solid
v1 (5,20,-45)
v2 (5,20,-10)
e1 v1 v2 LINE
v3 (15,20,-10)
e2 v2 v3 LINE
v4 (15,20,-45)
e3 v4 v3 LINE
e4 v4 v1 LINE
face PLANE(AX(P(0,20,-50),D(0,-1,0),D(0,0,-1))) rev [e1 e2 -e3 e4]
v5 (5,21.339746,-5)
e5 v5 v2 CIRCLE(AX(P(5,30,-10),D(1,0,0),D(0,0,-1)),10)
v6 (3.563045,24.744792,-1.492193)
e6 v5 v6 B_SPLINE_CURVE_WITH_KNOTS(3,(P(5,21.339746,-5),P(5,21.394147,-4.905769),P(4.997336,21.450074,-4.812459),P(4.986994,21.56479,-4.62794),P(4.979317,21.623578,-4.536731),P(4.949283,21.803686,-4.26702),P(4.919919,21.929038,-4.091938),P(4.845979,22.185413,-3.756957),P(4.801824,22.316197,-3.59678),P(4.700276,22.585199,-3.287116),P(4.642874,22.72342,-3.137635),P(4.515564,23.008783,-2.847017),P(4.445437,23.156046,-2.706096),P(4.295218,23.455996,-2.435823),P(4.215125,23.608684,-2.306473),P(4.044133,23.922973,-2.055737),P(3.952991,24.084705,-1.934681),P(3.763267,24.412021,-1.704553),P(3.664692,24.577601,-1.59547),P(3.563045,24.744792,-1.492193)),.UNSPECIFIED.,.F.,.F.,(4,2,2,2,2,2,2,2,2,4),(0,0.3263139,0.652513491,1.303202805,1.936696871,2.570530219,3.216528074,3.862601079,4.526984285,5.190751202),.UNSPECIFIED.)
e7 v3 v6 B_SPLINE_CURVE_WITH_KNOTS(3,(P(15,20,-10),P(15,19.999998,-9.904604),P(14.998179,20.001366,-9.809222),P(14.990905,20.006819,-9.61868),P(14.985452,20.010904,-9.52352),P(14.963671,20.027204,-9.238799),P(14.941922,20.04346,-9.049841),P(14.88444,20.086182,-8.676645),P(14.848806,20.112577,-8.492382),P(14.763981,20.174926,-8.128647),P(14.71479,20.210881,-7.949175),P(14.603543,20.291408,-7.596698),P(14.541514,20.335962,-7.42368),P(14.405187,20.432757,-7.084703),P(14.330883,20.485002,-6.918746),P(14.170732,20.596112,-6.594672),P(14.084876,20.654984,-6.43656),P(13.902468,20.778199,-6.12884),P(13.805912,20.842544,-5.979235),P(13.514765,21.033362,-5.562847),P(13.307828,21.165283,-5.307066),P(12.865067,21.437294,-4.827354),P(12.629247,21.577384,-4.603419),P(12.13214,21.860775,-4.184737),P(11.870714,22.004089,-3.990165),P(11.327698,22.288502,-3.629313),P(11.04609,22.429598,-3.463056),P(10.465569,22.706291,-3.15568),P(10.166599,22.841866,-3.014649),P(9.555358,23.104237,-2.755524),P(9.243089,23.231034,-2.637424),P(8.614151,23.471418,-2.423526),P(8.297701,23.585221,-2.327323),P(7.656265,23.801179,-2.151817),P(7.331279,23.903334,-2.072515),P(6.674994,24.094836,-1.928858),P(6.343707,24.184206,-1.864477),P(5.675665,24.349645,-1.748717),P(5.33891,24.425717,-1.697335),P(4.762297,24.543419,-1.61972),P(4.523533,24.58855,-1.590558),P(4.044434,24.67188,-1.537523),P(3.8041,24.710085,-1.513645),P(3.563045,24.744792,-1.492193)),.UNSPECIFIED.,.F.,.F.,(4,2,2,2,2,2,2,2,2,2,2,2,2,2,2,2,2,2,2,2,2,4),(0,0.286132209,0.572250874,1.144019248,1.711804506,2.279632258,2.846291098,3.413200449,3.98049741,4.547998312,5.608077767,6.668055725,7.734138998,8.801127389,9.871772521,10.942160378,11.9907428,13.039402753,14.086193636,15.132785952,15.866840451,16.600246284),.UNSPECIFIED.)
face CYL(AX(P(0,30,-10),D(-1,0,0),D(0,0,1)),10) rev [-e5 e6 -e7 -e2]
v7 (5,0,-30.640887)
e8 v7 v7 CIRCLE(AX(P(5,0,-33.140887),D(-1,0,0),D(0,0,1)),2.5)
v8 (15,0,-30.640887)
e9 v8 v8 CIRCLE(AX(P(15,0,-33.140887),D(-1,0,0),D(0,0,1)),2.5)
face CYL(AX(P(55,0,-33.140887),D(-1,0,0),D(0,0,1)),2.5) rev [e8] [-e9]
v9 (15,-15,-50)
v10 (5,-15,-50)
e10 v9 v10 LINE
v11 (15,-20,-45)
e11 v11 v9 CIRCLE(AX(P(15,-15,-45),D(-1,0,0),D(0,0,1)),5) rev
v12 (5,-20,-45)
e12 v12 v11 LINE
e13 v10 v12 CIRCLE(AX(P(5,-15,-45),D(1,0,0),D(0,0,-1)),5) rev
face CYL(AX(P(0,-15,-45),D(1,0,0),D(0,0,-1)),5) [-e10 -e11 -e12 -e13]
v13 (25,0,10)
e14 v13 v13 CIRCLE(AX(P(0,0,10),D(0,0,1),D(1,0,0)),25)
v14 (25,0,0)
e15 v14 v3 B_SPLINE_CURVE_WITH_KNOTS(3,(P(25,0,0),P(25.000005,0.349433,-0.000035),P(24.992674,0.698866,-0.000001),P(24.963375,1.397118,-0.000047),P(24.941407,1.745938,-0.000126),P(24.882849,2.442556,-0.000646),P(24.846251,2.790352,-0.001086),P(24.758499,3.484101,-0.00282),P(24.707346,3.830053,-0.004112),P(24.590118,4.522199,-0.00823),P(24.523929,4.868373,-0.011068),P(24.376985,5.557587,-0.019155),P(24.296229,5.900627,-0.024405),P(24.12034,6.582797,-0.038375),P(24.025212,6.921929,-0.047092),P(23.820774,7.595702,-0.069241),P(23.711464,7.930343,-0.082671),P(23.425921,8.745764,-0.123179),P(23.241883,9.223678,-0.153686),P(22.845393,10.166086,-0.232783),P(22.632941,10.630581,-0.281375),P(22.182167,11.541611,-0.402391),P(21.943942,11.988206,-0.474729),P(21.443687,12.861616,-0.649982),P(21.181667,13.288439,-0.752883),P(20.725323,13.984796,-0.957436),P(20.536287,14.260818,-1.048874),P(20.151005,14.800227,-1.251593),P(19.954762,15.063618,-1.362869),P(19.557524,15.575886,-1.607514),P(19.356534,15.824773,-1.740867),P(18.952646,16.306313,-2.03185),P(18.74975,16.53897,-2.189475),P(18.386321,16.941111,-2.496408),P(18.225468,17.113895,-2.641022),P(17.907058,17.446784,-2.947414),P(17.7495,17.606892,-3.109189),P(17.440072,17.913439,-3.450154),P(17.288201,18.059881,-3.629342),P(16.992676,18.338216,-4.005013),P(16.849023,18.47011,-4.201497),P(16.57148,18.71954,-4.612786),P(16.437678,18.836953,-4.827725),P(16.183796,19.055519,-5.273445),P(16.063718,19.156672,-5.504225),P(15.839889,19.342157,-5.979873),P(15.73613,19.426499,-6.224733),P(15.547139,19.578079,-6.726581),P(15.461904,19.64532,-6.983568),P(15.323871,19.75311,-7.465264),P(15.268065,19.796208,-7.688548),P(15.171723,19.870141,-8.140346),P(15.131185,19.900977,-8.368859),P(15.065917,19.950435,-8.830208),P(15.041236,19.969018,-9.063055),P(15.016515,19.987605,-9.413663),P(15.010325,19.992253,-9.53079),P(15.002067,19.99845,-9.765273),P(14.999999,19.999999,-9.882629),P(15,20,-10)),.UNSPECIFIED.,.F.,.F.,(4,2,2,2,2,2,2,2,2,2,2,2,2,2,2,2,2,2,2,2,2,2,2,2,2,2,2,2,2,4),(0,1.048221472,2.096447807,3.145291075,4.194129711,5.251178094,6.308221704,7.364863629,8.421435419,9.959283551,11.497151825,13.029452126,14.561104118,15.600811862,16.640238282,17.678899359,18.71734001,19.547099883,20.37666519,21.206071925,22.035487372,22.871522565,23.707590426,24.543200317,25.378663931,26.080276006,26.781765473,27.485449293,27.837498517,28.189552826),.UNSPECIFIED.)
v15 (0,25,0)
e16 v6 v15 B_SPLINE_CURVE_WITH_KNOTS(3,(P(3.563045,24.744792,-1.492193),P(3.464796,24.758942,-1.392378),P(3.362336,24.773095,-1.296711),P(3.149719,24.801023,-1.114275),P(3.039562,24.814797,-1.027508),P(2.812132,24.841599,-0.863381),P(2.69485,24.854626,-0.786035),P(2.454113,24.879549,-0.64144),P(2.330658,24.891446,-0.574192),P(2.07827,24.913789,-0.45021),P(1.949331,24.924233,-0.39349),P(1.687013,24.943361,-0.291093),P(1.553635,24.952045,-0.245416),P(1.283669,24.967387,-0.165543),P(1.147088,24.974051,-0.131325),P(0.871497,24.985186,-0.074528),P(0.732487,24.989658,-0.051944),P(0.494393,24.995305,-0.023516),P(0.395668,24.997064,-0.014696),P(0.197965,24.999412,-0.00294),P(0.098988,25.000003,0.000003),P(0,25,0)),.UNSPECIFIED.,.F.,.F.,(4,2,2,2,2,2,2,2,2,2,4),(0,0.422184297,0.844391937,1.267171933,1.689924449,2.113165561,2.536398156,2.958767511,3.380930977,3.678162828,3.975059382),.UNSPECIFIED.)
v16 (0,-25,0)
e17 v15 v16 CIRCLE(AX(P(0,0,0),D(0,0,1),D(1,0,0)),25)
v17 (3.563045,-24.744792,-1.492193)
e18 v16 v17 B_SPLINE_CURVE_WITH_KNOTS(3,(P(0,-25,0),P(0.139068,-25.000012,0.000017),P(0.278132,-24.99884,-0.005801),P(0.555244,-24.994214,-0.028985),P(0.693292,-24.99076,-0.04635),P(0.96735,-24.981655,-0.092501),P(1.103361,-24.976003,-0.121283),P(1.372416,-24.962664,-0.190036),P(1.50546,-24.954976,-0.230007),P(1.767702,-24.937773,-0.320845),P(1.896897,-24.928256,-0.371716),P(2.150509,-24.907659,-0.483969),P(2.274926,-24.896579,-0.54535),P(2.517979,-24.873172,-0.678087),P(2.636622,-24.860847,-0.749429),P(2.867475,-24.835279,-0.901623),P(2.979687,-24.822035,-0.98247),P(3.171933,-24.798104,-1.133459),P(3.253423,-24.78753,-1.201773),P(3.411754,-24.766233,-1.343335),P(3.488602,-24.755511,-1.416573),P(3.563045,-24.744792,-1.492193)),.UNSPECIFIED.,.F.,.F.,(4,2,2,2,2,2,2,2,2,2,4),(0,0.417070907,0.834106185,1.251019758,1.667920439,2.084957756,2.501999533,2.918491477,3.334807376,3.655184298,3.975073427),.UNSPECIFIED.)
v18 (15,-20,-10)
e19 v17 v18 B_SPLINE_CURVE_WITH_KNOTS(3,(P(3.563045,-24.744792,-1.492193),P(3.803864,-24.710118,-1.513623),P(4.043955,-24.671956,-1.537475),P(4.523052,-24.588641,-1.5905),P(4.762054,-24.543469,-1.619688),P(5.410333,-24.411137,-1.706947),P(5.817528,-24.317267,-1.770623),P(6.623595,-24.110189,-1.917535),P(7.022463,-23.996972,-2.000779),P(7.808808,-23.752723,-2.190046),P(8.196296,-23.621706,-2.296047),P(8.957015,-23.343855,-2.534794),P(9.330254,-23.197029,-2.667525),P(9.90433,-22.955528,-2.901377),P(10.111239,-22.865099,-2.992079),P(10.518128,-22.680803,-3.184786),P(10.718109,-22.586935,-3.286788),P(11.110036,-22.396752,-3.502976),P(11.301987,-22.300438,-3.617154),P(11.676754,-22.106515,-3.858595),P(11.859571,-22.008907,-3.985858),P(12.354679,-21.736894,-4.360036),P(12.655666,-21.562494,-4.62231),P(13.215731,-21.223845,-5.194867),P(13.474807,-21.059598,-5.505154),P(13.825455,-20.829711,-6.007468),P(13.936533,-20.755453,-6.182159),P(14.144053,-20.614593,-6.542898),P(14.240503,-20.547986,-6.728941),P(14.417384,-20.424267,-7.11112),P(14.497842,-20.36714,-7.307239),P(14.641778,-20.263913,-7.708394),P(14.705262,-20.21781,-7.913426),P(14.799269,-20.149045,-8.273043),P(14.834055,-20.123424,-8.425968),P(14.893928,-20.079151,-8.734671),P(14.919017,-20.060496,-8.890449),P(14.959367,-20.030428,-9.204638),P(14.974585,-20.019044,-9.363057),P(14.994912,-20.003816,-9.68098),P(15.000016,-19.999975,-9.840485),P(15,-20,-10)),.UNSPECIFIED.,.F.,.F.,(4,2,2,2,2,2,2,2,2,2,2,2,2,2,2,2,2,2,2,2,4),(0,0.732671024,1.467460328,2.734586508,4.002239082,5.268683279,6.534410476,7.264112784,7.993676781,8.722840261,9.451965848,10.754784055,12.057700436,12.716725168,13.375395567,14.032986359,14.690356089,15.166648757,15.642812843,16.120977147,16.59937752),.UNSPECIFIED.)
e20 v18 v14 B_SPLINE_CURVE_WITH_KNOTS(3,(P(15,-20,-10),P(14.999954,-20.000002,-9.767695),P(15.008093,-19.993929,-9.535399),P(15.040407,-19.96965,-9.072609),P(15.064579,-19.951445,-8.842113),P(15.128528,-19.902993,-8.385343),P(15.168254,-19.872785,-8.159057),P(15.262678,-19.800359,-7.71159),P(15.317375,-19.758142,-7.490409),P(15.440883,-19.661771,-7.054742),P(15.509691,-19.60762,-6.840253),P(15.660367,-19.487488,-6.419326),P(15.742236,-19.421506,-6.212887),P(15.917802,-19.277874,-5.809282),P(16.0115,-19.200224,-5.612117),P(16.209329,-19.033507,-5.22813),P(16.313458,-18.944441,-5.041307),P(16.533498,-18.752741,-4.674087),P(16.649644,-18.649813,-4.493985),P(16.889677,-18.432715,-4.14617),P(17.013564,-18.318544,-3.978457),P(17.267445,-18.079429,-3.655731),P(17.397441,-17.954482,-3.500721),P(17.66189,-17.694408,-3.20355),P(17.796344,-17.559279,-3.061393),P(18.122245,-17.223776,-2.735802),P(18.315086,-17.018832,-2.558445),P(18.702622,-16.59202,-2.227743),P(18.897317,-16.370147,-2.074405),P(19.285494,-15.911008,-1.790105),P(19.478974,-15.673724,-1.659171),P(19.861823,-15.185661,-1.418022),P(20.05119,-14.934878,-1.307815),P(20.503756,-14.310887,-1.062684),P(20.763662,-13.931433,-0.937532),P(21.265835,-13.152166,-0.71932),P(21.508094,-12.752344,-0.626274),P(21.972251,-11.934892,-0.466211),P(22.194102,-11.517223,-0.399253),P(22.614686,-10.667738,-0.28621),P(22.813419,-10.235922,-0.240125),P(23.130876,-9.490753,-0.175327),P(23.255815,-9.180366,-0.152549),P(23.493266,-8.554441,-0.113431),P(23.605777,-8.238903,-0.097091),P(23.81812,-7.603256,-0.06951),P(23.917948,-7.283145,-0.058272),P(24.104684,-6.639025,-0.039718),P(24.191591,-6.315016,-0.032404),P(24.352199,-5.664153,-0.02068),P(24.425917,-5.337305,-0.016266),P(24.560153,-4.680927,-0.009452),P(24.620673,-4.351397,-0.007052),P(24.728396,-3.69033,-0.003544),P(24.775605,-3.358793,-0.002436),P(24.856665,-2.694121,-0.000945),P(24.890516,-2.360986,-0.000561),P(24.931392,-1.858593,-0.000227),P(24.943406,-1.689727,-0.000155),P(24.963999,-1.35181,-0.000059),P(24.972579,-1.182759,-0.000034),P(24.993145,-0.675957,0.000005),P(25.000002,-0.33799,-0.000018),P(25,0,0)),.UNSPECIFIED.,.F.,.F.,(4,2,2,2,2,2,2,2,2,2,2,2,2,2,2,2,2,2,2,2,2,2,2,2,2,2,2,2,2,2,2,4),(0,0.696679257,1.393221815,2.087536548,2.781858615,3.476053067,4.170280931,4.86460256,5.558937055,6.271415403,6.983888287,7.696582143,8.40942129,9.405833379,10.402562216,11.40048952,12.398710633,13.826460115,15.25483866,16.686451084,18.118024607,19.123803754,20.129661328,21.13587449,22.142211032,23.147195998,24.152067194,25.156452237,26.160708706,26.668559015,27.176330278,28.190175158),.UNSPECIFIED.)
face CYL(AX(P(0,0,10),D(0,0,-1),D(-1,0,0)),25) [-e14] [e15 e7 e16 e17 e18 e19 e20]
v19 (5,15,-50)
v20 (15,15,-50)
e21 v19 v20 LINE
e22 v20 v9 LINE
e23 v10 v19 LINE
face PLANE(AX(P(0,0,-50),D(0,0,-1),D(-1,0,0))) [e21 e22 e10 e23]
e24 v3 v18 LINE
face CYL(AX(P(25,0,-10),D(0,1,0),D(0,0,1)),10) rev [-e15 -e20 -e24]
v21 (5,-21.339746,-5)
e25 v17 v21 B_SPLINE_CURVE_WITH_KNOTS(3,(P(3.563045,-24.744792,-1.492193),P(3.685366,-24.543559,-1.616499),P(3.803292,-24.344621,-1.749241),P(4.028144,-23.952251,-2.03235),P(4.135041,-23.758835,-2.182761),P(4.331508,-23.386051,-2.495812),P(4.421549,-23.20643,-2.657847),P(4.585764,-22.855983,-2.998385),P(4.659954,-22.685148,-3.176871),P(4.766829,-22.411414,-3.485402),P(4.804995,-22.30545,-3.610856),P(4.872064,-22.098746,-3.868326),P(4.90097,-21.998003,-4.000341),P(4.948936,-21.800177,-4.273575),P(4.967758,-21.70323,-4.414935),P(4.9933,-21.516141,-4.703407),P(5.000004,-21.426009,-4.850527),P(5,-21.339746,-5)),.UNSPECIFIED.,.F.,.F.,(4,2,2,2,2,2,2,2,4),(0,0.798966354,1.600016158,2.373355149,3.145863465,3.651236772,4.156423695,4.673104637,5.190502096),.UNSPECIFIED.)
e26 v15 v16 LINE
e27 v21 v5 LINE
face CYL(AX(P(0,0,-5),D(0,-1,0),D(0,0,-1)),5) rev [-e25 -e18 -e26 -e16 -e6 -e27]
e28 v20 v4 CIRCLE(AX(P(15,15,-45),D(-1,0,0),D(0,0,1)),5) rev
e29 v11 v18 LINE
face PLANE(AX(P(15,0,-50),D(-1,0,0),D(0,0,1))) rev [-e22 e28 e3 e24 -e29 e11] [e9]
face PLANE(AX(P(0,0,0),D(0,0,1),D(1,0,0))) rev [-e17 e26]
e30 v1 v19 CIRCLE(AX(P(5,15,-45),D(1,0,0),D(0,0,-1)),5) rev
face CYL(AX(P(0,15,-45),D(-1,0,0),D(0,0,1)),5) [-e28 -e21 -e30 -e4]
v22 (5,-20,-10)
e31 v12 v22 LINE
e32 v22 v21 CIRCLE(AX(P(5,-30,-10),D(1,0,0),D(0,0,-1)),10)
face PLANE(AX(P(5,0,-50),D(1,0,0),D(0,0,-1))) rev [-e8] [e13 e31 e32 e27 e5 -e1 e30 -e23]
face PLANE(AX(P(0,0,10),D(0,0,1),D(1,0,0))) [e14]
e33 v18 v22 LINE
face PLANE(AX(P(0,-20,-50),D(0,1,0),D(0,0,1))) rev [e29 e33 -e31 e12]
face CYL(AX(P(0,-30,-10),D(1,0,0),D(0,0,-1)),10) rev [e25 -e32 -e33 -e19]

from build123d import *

# Parameters (mm, degrees)
SKETCH1_W           = 10
SKETCH1_H           = 40
BOSS_EXTRUDE1_DEPTH = 10
SKETCH2_W           = 10
SKETCH2_H           = 40
BOSS_EXTRUDE2_DEPTH = 50
FILLET1_R           = 10
FILLET2_R           = 10
FILLET3_R           = 5
SKETCH3_R           = 2.4999999999999982
CUT_EXTRUDE1_DEPTH  = 50


with BuildPart() as part:
    # Sketch1 → Boss-Extrude1 (new body)
    with BuildSketch(Plane.XY):
        with BuildLine():
            Line((15, -20), (5.000000000000001, -20))
            Line((5.000000000000001, -20), (5.000000000000001, 20))
            Line((5.000000000000001, 20), (15, 20))
            ThreePointArc((15.000000000000002, 20), (-25, 3.06e-15), (14.999999999999995, -20.000000000000004))
        make_face()
        with BuildLine():
            Line((15.000000000000002, 20), (15.000000000000002, -20))
            ThreePointArc((14.999999999999995, -20.000000000000004), (22.360679774997894, -11.180339887498954), (25, -6.12e-15))
            ThreePointArc((25, 0), (22.360679774997898, 11.180339887498947), (15.000000000000002, 20))
        make_face()
        with Locations((10.000000000000002, 0)):
            Rectangle(SKETCH1_W, SKETCH1_H)
    extrude(amount=BOSS_EXTRUDE1_DEPTH)

    # Sketch2 → Boss-Extrude2 (add)
    with BuildSketch(Plane(origin=(0, 0, 0), x_dir=(-1, 0, 0), z_dir=(0, 0, -1))):
        with Locations((-10.000000000000002, 0)):
            Rectangle(SKETCH2_W, SKETCH2_H)
    extrude(amount=BOSS_EXTRUDE2_DEPTH)

    # Fillet1
    # the kernel refuses this fillet: 10 mm, written as the material it adds along each edge
    with BuildSketch(Plane(origin=(15.000000000000002, 20, 0), x_dir=(1, 0, 0), z_dir=(0, -1, 0))) as fillet1_piece_1_section:
        with BuildLine():
            CenterArc((FILLET1_R, -FILLET1_R), FILLET1_R, 90, 90)
            Line((-1.78e-15, -FILLET1_R), (-FILLET1_R * 0.02, -FILLET1_R))
            Line((-FILLET1_R * 0.02, -FILLET1_R), (-FILLET1_R * 0.02, FILLET1_R * 0.02))
            Line((-FILLET1_R * 0.02, FILLET1_R * 0.02), (FILLET1_R, FILLET1_R * 0.02))
            Line((FILLET1_R, FILLET1_R * 0.02), (FILLET1_R, 0))
        make_face()
    fillet1_piece_1 = extrude(amount=40, mode=Mode.PRIVATE)
    fillet1_piece_1 = fillet1_piece_1 & Plane(origin=(0, 0, -2.4332556101224805), x_dir=(0.6000000000000001, 0.8, 0), z_dir=(0, 0, -1)) * Cylinder(25, 120, mode=Mode.PRIVATE)
    add(fillet1_piece_1)

    # Fillet2
    # the kernel refuses this fillet: 10 mm, written as the material it adds along each edge
    with BuildSketch(Plane(origin=(5.000000000000001, 20, 0), x_dir=(0, 0, -1), z_dir=(1, 0, 0))) as fillet2_piece_1_section:
        with BuildLine():
            CenterArc((FILLET2_R, FILLET2_R), FILLET2_R, 180, 90)
            Line((-1.78e-15, FILLET2_R), (0, 0))
            Line((0, 0), (FILLET2_R, 0))
        make_face()
    fillet2_piece_1 = extrude(amount=9.8, mode=Mode.PRIVATE)
    fillet2_piece_1 = fillet2_piece_1 & Plane(origin=(0, 0, -2.8273844983564325), x_dir=(0.6000000000000001, 0.8, 0), z_dir=(0, 0, -1)) * Cylinder(25, 60, mode=Mode.PRIVATE)
    add(fillet2_piece_1)
    with BuildSketch(Plane(origin=(14.8, -20, 0), x_dir=(0, 0, -1), z_dir=(-1, 0, 0))) as fillet2_piece_2_section:
        with BuildLine():
            CenterArc((FILLET2_R, FILLET2_R), FILLET2_R, 180, 90)
            Line((-1.78e-15, FILLET2_R), (0, 0))
            Line((0, 0), (FILLET2_R, 0))
        make_face()
    fillet2_piece_2 = extrude(amount=9.799999999999999, mode=Mode.PRIVATE)
    fillet2_piece_2 = fillet2_piece_2 & Plane(origin=(0, 0, -2.827384190918209), x_dir=(0.6000000000000001, 0.8, 0), z_dir=(0, 0, -1)) * Cylinder(25, 60, mode=Mode.PRIVATE)
    add(fillet2_piece_2)
    with BuildSketch(Plane(origin=(40, -20, 0), x_dir=(0, 0, -1), z_dir=(-1, 0, 0))) as fillet2_piece_3_section:
        with BuildLine():
            CenterArc((FILLET2_R, FILLET2_R), FILLET2_R, 180, 90)
            Line((-1.78e-15, FILLET2_R), (0, 0))
            Line((0, 0), (FILLET2_R, 0))
        make_face()
    fillet2_piece_3 = extrude(amount=25.2, mode=Mode.PRIVATE)
    fillet2_piece_3 = fillet2_piece_3 & Plane(origin=(0, 0, -4.548731102364826), x_dir=(0.6, 0.8, 0), z_dir=(0, 0, -1)) * Cylinder(25, 91, mode=Mode.PRIVATE)
    add(fillet2_piece_3)
    with BuildSketch(Plane(origin=(14.8, 20, 0), x_dir=(0, 0, -1), z_dir=(1, 0, 0))) as fillet2_piece_4_section:
        with BuildLine():
            CenterArc((FILLET2_R, FILLET2_R), FILLET2_R, 180, 90)
            Line((-1.78e-15, FILLET2_R), (0, 0))
            Line((0, 0), (FILLET2_R, 0))
        make_face()
    fillet2_piece_4 = extrude(amount=25.2, mode=Mode.PRIVATE)
    fillet2_piece_4 = fillet2_piece_4 & Plane(origin=(0, 0, -4.548731089357503), x_dir=(0.6, 0.8, 0), z_dir=(0, 0, -1)) * Cylinder(25, 91, mode=Mode.PRIVATE)
    add(fillet2_piece_4)

    # Fillet3
    # the kernel refuses this fillet: 5 mm, written as the material it adds along each edge
    with BuildSketch(Plane(origin=(5, -36.99489742783178, 0), x_dir=(-1, 0, 0), z_dir=(0, 1, 0))) as fillet3_piece_1_section:
        with BuildLine():
            CenterArc((FILLET3_R, -FILLET3_R), FILLET3_R, 90, 90)
            Line((-8.9e-16, -FILLET3_R), (0, 0))
            Line((0, 0), (FILLET3_R, 0))
        make_face()
    fillet3_piece_1 = extrude(amount=73.98979485566356, mode=Mode.PRIVATE)
    fillet3_piece_1 = fillet3_piece_1 - Plane(origin=(3.8491362999010033, 30, -10), x_dir=(0, 0, -1), z_dir=(-1, 0, 0)) * Cylinder(10, 168, mode=Mode.PRIVATE)
    fillet3_piece_1 = fillet3_piece_1 & Plane(origin=(0, 0, -1.1013150030841163), x_dir=(0.6000000000000001, 0.8, 0), z_dir=(0, 0, -1)) * Cylinder(25, 168, mode=Mode.PRIVATE)
    fillet3_piece_1 = fillet3_piece_1 - Plane(origin=(3.849136299901005, -30, -10), x_dir=(0, 0, -1), z_dir=(1, 0, 0)) * Cylinder(10, 168, mode=Mode.PRIVATE)
    add(fillet3_piece_1)
    # the kernel refuses this fillet: 5 mm, written as the material it takes off along each edge
    with BuildSketch(Plane(origin=(27.5, -20, -50), x_dir=(0, 1, 0), z_dir=(-1, 0, 0))) as fillet3_2_piece_1:
        with BuildLine():
            CenterArc((FILLET3_R, -FILLET3_R), FILLET3_R, 90, 90)
            Line((0, -FILLET3_R), (0, 0))
            Line((0, 0), (FILLET3_R, 0))
        make_face()
    extrude(amount=35, mode=Mode.SUBTRACT)
    with BuildSketch(Plane(origin=(-7.499999999999999, 20, -50), x_dir=(0, 0, 1), z_dir=(1, 0, 0))) as fillet3_2_piece_2:
        with BuildLine():
            CenterArc((FILLET3_R, FILLET3_R), FILLET3_R, 180, 90)
            Line((0, FILLET3_R), (0, 0))
            Line((0, 0), (FILLET3_R, 0))
        make_face()
    extrude(amount=35, mode=Mode.SUBTRACT)

    # Sketch3 → Cut-Extrude1 (cut)
    with BuildSketch(Plane.ZY.offset(-5.000000000000001)):
        with Locations((-33.14088712721044, 0)):
            Circle(SKETCH3_R)
    extrude(amount=-CUT_EXTRUDE1_DEPTH, mode=Mode.SUBTRACT)


solid = part.part
